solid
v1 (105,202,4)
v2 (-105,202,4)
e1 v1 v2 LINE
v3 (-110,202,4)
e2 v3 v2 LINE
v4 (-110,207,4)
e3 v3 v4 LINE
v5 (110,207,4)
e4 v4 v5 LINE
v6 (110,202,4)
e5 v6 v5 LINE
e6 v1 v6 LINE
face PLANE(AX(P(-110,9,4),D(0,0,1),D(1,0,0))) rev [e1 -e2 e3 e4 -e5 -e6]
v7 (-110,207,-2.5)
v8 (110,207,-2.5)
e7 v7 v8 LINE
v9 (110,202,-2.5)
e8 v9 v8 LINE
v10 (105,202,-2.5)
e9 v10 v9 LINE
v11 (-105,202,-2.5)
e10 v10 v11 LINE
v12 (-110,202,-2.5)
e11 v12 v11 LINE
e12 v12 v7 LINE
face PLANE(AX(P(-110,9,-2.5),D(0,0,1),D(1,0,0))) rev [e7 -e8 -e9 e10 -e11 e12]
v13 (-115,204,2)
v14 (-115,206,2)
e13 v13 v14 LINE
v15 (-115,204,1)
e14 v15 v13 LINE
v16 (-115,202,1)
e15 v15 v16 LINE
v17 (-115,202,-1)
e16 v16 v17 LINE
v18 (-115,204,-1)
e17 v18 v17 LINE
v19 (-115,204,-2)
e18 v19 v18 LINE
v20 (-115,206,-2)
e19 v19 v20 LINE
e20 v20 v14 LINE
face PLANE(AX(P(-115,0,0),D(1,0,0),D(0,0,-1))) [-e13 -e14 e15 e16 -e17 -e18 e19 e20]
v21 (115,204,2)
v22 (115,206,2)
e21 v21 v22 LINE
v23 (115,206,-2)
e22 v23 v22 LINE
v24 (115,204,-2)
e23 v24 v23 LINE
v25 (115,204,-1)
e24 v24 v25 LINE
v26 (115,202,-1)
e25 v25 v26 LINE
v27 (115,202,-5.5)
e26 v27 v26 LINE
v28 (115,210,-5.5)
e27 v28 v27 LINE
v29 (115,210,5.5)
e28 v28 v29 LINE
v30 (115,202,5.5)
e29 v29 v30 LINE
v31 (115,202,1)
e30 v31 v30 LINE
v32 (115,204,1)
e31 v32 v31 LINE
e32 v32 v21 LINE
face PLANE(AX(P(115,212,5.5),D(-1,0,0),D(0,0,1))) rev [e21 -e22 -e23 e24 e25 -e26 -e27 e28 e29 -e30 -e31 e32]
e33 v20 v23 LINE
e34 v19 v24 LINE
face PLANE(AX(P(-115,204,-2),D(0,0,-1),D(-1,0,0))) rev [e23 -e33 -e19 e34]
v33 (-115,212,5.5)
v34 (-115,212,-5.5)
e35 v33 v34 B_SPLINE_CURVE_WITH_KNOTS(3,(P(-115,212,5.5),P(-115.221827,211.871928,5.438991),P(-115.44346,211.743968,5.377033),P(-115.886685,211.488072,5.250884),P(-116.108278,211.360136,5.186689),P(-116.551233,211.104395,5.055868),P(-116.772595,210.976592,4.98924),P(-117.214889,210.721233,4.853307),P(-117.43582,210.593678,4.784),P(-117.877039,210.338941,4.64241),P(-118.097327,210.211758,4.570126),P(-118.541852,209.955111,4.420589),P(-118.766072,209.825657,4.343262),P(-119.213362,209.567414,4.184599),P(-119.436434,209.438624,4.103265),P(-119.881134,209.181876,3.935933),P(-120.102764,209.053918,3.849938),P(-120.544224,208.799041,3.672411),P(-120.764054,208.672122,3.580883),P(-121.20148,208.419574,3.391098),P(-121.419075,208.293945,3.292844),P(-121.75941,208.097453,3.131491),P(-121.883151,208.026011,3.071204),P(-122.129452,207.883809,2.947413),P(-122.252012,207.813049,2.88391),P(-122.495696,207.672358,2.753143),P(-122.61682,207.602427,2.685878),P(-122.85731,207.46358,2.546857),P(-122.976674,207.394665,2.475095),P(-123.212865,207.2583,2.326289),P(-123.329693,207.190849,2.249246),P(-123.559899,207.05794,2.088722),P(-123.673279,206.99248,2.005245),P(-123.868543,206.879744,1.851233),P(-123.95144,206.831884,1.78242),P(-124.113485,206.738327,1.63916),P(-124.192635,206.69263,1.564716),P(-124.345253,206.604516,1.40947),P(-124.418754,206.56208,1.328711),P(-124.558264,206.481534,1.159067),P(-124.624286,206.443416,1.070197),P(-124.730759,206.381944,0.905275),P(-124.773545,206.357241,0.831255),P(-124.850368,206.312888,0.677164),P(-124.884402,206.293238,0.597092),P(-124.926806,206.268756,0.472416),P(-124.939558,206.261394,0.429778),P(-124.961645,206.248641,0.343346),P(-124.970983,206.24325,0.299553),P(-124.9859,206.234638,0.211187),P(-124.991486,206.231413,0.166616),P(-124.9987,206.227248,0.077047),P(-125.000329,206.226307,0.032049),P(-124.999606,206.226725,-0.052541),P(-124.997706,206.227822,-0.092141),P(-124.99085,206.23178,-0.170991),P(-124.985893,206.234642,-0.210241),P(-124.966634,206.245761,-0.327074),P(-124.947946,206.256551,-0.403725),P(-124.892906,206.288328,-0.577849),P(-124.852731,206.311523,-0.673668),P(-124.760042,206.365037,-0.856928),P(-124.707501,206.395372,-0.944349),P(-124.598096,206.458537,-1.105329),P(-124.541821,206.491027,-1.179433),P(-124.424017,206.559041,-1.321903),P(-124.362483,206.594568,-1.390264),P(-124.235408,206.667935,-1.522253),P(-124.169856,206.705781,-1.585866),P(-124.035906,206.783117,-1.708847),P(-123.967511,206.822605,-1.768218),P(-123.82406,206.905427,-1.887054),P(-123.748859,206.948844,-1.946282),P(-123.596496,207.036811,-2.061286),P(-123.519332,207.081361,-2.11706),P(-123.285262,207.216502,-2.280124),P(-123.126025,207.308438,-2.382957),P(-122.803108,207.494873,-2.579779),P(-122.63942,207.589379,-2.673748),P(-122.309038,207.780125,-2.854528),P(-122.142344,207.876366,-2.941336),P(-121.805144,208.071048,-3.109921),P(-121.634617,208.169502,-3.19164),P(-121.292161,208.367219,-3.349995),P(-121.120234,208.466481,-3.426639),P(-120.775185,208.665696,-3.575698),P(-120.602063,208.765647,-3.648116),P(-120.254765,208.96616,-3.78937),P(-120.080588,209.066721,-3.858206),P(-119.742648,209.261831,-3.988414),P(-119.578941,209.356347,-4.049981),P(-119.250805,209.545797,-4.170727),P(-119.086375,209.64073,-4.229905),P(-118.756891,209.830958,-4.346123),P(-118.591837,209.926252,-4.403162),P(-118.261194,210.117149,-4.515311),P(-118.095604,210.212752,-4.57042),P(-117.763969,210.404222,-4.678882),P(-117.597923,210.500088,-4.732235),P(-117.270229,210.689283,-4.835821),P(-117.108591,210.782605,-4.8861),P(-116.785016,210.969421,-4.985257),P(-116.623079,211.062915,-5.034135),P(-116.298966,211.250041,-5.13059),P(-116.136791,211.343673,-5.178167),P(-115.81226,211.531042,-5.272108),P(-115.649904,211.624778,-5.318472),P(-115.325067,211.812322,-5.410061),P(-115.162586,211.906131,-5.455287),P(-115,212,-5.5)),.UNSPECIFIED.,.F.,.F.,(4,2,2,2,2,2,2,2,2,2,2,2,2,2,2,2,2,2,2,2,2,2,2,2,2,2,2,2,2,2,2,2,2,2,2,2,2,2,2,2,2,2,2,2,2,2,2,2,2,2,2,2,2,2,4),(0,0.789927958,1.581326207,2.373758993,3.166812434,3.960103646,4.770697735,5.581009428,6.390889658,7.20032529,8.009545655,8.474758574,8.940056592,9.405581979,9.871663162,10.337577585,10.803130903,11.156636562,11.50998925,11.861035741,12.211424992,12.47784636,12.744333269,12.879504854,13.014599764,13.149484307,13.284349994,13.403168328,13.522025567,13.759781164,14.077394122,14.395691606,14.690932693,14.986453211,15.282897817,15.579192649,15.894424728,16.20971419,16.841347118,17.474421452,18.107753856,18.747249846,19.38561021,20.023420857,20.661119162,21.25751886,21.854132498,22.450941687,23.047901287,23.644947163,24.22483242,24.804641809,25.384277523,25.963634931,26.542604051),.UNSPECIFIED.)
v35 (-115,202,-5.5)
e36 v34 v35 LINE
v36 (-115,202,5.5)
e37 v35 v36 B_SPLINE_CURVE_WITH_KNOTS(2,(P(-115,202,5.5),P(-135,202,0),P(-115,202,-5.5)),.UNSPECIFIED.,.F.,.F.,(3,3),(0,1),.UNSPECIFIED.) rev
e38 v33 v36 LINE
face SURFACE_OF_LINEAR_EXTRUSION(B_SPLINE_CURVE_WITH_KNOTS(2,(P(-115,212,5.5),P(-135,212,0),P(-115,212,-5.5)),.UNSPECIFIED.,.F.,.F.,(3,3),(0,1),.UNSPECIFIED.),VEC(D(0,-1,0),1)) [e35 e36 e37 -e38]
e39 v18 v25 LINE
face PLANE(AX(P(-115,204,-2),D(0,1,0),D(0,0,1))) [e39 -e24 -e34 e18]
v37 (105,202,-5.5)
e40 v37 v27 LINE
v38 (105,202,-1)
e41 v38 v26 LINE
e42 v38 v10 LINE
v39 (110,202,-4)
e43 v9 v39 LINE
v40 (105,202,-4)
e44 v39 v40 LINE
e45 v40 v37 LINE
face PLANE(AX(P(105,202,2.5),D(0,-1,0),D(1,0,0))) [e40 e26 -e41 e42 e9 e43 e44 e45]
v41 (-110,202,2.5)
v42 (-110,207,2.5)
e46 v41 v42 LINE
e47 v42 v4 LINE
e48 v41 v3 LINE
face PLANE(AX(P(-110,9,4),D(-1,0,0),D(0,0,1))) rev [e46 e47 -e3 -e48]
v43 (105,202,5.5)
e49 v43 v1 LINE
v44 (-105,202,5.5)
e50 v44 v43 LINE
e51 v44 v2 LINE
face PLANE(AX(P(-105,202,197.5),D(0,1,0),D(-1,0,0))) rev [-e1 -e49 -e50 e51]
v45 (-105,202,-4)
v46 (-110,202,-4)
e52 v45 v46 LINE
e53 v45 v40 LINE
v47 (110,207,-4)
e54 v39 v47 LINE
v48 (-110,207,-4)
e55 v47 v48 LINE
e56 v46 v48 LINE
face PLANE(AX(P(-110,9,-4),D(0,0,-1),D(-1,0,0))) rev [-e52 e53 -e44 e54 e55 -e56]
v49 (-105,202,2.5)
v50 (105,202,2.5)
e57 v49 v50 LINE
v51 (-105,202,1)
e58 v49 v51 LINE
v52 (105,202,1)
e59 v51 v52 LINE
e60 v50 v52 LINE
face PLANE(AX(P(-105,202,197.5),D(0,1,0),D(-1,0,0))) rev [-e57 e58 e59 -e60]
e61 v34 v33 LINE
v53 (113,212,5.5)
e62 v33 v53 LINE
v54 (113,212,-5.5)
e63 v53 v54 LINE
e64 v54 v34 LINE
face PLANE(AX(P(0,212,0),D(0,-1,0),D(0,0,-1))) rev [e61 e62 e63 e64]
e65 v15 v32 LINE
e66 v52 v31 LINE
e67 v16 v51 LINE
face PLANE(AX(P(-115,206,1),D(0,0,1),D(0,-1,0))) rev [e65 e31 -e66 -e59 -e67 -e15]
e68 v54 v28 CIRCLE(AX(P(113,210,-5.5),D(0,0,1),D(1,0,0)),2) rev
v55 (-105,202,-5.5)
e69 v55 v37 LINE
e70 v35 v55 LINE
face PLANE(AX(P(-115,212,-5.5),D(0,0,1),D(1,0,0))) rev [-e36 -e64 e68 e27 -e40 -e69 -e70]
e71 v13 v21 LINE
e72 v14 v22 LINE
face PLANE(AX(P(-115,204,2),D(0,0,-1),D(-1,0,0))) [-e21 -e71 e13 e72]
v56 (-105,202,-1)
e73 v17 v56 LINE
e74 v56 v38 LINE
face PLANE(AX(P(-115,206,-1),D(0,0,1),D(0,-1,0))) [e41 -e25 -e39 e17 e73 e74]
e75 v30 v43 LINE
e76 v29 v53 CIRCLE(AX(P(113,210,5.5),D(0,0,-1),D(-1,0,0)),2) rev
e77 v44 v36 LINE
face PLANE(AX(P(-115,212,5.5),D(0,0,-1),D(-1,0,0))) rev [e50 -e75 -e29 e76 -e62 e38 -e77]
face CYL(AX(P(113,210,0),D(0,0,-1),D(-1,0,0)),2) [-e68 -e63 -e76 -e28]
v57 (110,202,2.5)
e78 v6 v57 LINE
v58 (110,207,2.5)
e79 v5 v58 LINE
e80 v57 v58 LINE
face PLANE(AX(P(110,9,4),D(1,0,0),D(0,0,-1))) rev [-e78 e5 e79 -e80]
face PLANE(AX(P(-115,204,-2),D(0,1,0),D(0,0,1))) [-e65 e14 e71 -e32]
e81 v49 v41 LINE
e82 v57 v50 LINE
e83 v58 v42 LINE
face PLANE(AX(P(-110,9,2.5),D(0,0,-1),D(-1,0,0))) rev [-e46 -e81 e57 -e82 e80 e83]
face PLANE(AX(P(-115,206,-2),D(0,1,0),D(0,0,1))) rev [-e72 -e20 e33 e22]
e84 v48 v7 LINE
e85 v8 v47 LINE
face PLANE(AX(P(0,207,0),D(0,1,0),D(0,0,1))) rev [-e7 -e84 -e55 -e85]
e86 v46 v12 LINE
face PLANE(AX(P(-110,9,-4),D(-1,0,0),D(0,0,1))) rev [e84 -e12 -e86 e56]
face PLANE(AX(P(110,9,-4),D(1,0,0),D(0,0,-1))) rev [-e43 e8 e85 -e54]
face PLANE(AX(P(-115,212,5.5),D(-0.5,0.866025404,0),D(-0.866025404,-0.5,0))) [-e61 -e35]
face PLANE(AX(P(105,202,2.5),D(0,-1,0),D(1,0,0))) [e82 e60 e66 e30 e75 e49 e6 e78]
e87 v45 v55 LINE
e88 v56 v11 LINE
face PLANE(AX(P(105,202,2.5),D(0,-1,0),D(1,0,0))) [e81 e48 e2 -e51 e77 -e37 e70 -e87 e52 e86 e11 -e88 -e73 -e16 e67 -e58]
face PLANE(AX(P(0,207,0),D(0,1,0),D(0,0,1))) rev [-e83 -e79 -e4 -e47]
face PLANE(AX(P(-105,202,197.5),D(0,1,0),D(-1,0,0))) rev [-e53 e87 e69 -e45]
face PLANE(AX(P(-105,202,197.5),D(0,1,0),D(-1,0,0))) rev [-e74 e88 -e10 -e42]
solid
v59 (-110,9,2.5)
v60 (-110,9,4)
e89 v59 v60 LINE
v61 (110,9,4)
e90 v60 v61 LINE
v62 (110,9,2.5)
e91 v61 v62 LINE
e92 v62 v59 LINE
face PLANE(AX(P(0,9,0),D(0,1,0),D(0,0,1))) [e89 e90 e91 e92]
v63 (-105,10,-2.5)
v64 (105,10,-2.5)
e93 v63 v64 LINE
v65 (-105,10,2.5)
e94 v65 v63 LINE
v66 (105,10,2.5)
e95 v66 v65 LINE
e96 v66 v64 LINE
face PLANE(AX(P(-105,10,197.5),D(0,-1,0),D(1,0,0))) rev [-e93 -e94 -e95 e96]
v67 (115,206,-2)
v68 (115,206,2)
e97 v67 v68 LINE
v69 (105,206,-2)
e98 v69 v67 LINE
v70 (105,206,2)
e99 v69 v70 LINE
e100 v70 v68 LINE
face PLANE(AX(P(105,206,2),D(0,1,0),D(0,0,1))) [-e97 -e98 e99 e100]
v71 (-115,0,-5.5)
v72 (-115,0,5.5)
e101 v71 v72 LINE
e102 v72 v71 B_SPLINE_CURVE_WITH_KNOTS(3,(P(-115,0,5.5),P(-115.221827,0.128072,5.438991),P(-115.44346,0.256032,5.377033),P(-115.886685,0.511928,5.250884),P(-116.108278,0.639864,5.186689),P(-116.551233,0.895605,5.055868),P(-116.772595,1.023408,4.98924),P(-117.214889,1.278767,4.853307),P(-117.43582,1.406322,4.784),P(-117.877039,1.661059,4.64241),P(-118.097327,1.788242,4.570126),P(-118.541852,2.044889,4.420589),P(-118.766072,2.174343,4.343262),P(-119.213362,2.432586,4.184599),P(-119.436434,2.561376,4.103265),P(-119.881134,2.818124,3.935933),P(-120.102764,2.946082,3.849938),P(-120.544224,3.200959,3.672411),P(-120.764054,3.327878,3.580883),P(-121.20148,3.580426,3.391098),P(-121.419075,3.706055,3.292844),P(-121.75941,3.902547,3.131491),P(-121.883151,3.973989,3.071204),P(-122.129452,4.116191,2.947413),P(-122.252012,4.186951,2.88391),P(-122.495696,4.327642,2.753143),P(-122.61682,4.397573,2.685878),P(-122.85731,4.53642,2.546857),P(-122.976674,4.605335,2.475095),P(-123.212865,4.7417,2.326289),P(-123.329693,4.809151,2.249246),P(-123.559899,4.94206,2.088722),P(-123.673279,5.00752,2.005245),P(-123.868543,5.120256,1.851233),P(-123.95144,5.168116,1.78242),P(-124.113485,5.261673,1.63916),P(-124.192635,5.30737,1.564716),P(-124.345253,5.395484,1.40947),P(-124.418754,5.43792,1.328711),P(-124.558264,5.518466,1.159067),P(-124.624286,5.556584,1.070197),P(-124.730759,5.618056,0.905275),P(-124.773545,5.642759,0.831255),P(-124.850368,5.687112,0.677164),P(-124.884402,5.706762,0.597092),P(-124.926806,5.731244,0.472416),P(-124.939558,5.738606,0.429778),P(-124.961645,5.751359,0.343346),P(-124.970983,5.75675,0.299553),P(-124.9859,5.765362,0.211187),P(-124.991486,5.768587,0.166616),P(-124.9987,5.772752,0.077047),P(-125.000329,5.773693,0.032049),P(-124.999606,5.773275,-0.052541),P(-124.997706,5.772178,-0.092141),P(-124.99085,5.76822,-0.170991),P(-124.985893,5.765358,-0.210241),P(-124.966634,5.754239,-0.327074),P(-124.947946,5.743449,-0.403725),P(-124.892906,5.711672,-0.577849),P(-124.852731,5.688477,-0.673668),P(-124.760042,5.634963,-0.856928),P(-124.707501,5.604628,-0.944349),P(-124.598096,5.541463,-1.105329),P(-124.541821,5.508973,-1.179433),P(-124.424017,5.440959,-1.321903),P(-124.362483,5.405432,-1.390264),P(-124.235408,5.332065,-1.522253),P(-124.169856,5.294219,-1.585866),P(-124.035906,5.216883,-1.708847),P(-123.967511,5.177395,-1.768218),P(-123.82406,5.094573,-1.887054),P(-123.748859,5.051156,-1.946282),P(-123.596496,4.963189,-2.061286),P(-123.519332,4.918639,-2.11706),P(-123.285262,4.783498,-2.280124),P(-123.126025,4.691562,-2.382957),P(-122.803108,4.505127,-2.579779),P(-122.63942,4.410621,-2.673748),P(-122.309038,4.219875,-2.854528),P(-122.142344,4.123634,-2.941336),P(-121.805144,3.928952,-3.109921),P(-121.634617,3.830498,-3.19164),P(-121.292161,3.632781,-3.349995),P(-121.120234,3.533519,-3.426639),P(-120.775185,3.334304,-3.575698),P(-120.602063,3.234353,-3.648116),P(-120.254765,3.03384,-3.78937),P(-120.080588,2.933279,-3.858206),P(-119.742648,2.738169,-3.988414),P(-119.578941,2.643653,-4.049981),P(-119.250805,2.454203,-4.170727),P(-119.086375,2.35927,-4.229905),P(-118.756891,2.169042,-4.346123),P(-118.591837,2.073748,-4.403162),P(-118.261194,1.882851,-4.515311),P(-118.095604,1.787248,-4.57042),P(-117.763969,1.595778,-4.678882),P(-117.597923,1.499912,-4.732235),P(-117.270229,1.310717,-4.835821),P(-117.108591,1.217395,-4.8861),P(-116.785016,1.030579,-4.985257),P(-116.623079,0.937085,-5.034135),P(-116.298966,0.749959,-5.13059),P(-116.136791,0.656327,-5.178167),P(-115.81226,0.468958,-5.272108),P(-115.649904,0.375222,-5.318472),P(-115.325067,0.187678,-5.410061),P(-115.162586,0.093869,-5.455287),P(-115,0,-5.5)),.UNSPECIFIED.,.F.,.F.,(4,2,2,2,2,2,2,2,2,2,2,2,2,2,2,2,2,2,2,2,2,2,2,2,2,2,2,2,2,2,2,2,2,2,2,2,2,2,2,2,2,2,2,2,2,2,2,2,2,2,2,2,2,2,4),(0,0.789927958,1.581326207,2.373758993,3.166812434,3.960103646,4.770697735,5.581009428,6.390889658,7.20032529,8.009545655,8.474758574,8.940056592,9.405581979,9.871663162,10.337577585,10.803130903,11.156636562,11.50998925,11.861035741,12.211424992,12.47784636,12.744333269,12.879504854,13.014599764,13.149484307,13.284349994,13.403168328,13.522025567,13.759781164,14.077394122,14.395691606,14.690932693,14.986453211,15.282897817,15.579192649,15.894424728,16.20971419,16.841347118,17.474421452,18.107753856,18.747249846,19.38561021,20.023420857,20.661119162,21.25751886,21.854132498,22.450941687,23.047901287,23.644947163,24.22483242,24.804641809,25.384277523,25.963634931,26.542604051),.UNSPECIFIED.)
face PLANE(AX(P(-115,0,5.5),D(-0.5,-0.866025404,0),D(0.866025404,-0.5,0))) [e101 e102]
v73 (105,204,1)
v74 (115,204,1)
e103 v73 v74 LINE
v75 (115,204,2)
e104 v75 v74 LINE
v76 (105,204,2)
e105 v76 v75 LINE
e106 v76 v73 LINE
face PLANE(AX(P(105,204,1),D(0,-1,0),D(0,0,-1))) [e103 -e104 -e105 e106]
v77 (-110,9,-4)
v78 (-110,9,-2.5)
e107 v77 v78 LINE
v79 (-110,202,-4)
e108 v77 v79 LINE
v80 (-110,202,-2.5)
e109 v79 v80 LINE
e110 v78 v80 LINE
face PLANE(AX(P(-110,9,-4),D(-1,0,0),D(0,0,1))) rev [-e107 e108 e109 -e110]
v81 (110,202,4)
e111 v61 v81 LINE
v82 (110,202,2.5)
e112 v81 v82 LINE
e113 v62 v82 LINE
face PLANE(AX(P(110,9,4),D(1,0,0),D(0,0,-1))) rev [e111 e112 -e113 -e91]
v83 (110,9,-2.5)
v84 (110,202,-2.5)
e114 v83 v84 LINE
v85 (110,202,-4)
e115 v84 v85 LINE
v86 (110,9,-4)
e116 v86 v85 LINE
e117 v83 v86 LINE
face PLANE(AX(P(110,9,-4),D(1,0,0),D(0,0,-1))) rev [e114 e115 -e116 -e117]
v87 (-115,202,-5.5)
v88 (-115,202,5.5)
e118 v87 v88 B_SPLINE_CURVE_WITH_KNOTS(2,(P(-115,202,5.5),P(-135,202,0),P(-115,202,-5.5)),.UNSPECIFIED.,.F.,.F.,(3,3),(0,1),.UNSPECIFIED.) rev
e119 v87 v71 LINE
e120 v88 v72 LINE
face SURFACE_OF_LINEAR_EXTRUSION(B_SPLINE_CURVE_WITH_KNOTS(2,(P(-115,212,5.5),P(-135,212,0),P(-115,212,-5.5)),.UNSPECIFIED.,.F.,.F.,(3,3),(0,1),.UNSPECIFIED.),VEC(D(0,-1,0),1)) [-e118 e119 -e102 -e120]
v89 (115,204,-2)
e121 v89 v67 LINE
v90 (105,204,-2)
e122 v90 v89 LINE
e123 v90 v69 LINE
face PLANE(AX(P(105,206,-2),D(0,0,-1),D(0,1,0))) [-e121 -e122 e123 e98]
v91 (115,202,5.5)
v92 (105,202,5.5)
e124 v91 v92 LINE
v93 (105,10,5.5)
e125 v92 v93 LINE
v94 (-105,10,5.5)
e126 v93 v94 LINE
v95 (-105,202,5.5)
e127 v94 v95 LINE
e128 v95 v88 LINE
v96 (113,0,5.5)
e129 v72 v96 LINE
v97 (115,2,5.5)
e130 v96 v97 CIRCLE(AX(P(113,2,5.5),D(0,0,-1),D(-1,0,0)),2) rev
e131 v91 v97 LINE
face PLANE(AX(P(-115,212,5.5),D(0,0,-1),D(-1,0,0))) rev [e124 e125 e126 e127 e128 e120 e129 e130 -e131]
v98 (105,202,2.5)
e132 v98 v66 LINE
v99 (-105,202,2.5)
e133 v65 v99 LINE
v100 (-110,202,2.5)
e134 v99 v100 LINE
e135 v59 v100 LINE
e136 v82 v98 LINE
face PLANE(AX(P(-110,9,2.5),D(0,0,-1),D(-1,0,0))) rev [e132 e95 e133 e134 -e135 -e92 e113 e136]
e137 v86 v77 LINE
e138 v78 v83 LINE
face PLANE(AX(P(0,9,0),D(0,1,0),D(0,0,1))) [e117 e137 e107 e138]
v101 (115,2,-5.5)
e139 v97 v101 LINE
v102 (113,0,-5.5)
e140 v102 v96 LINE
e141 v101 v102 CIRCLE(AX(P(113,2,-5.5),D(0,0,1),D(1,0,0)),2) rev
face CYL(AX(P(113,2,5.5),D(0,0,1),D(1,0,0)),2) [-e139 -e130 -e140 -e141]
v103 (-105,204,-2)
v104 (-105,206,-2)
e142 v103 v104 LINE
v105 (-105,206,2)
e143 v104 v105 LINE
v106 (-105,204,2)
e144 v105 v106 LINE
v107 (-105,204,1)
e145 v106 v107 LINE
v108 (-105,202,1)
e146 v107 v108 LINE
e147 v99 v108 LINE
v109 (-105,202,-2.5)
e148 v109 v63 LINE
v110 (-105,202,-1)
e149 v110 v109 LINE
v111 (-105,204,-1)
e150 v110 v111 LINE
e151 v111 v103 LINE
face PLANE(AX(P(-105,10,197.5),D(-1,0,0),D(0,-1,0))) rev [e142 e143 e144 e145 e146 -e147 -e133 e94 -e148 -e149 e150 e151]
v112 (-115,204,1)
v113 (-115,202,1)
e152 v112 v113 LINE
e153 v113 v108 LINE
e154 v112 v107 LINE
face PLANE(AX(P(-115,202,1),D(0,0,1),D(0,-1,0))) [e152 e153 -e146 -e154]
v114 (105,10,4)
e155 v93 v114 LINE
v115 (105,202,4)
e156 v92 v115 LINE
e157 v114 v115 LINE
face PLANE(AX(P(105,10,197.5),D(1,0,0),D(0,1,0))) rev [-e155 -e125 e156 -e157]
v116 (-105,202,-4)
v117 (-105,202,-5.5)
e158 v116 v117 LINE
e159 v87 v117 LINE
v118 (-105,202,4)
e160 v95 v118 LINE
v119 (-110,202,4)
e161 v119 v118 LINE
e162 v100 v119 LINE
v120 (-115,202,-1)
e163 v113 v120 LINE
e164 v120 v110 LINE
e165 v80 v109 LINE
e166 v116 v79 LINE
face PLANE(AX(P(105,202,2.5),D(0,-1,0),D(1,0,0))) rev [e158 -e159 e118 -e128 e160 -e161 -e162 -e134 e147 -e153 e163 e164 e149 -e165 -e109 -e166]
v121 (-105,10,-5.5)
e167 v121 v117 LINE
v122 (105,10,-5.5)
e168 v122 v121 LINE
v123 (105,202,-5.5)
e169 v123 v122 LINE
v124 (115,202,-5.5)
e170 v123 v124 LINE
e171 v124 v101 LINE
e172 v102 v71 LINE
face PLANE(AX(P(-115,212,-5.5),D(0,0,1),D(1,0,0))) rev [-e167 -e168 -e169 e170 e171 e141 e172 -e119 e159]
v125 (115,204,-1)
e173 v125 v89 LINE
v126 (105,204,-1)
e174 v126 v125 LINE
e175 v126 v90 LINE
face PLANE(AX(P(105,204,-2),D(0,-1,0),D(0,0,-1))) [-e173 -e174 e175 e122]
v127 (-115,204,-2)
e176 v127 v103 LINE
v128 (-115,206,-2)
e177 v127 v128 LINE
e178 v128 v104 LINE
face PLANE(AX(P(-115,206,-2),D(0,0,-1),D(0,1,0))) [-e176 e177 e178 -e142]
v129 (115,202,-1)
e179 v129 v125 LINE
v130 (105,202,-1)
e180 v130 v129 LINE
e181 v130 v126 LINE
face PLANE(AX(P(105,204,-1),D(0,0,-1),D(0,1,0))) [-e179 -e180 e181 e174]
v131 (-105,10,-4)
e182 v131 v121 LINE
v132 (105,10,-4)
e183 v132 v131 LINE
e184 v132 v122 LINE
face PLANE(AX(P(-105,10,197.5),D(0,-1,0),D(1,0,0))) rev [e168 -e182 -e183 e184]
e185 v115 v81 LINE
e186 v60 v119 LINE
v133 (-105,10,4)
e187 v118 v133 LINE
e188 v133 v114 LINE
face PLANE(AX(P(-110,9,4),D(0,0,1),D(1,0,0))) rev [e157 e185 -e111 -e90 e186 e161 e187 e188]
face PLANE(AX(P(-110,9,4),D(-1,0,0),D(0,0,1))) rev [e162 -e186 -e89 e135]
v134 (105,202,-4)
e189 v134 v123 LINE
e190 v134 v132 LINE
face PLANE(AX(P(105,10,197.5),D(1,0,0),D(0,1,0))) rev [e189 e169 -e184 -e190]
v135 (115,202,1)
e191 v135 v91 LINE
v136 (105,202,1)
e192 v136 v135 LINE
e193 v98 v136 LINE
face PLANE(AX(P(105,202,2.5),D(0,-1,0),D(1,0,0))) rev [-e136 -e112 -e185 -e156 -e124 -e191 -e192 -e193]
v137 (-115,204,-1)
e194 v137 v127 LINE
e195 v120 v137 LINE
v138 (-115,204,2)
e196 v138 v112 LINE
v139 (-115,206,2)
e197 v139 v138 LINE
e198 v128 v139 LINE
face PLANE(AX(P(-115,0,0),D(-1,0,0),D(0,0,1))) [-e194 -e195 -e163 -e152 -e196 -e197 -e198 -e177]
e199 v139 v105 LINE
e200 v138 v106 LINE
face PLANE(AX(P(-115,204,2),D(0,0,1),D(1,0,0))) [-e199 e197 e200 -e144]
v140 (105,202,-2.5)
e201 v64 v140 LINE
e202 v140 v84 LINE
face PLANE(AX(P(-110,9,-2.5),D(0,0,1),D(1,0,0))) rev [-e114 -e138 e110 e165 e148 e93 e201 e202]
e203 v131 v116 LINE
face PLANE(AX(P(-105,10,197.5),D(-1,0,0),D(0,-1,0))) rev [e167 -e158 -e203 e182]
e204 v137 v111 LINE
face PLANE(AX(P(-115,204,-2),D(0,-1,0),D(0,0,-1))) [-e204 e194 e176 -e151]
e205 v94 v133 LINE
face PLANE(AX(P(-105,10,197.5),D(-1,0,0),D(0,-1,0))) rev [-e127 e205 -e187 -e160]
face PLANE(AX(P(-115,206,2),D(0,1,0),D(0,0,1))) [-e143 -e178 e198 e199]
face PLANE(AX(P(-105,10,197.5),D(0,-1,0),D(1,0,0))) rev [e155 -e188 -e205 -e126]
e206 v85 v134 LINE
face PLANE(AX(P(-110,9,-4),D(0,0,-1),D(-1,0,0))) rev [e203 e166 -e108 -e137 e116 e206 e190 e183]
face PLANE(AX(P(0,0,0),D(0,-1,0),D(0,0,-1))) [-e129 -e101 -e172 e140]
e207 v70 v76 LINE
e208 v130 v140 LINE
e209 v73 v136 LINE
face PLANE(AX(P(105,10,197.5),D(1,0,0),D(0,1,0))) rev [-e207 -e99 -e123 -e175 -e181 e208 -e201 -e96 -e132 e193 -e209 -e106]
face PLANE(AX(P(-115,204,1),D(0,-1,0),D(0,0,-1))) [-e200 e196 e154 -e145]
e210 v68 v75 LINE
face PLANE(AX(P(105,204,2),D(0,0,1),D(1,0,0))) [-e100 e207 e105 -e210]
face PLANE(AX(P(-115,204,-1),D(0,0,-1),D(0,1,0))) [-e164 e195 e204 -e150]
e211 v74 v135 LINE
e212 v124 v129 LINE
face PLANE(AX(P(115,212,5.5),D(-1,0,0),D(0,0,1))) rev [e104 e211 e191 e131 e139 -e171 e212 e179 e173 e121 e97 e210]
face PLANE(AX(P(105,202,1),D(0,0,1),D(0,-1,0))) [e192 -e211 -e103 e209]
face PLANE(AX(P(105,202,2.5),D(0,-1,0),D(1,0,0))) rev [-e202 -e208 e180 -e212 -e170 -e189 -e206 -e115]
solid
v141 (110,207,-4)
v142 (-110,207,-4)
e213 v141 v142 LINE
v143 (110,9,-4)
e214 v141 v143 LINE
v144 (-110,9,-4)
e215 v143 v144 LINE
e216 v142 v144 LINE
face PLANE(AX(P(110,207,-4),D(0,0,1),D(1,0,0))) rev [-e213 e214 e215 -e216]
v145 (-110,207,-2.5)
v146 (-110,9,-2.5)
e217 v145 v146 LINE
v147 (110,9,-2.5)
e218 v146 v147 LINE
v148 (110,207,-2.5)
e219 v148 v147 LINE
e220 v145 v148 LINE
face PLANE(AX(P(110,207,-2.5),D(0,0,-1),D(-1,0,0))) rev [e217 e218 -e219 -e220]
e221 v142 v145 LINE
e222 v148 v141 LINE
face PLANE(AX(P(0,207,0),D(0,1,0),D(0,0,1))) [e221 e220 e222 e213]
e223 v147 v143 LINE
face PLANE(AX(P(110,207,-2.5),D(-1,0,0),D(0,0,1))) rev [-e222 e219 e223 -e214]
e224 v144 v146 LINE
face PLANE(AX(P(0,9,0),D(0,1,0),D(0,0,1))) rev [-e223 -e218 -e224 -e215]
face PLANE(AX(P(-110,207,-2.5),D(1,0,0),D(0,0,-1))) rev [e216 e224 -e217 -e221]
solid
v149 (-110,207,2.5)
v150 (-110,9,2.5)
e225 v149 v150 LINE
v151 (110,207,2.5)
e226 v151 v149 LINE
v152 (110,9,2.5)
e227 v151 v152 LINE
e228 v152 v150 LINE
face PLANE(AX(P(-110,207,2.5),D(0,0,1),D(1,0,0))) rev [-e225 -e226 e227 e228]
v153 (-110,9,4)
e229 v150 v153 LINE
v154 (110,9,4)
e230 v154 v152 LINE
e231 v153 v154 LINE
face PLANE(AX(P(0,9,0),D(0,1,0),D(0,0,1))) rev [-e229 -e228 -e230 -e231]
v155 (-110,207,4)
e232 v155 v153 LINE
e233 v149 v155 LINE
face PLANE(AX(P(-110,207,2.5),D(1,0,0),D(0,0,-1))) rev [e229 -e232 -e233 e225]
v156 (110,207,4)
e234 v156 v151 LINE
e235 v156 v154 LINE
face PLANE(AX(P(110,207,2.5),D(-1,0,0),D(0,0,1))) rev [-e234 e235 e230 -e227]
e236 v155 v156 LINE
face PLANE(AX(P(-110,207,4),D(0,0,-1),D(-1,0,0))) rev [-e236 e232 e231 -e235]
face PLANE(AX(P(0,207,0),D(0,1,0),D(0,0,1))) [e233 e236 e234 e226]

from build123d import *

# Parameters (mm, degrees)
SKETCH_2_W                 = 230
SKETCH_2_H                 = 11
EXTRUDE_1_DEPTH            = 212
SKETCH_3_W                 = 220
SKETCH_3_H                 = 1.5
CUT_EXTRUDE_1_DEPTH        = 198
SKETCH_4_W                 = 210
SKETCH_4_H                 = 192
CUT_EXTRUDE_2_DEPTH        = 203
EXTRUDE_2_DEPTH            = 212
DRAFT_START                = -7
DRAFT_4_DEPTH              = 14
SKETCH_6_W                 = 220
SKETCH_6_H                 = 1.5
EXTRUDE_3_DEPTH            = 198
EXTRUDE_3_2_DEPTH          = 198
FILLET_4_R                 = 2
SPLIT_START                = -2.5
SPLIT_BODIES_2_OUTLINE_W   = 220
SPLIT_BODIES_2_OUTLINE_H   = 5
SPLIT_BODIES_2_DEPTH       = 5
SPLIT_START_2              = -5.5
SPLIT_BODIES_2_2_OUTLINE_W = 220
SPLIT_BODIES_2_2_OUTLINE_H = 5
SPLIT_BODIES_2_2_DEPTH     = 1.5
SPLIT_START_3              = 4
SPLIT_BODIES_2_3_OUTLINE_W = 220
SPLIT_BODIES_2_3_OUTLINE_H = 5
SPLIT_BODIES_2_3_DEPTH     = 1.5
SPLIT_START_4              = 207
SPLIT_BODIES_2_4_DEPTH     = 5
SPLIT_START_5              = 202
SPLIT_BODIES_2_5_OUTLINE_W = 5
SPLIT_BODIES_2_5_OUTLINE_H = 11
SPLIT_BODIES_2_5_DEPTH     = 5
SPLIT_START_6              = -6
SPLIT_BODIES_2_6_DEPTH     = 12
SPLIT_BODIES_2_7_DEPTH     = 10
SKETCH_7_W                 = 2
SKETCH_7_H                 = 4
SKETCH_7_W_2               = 4
SKETCH_7_H_2               = 2
CUT_EXTRUDE_3_DEPTH        = 230
EXTRUDE_4_DEPTH            = 10
PATTERN_LINEAR_1_COUNT     = 2
PATTERN_LINEAR_1_PITCH     = 220


with BuildPart() as part:
    # Эскиз2 → Бобышка-Вытянуть1 (new body)
    with BuildSketch(Plane(origin=(0, 0, 0), x_dir=(1, 0, 0), z_dir=(0, 1, 0))):
        Rectangle(SKETCH_2_W, SKETCH_2_H)
    extrude(amount=EXTRUDE_1_DEPTH)

    # Эскиз3 → Вырез-Вытянуть1 (cut)
    with BuildSketch(Plane(origin=(0, 207, 0), x_dir=(1, 0, 0), z_dir=(0, 1, 0))):
        with Locations((0, 3.25)):
            Rectangle(SKETCH_3_W, SKETCH_3_H)
        with Locations((0, -3.25)):
            Rectangle(SKETCH_3_W, SKETCH_3_H)
    extrude(amount=-CUT_EXTRUDE_1_DEPTH, mode=Mode.SUBTRACT)

    # Эскиз4 → Вырез-Вытянуть2 (cut)
    with BuildSketch(Plane(origin=(0, 0, -5.5), x_dir=(-1, 0, 0), z_dir=(0, 0, -1))):
        with Locations((0, 106)):
            Rectangle(SKETCH_4_W, SKETCH_4_H)
    extrude(amount=-CUT_EXTRUDE_2_DEPTH, mode=Mode.SUBTRACT)


with BuildPart() as body_2:
    # Эскиз5 → Бобышка-Вытянуть2 (new body)
    with BuildSketch(Plane(origin=(0, 0, 0), x_dir=(-1, 0, 0), z_dir=(0, -1, 0))):
        with BuildLine():
            Line((115, -5.5), (115, 5.5))
            add(Edge.make_bspline(
                [(115, 5.5), (135, 0), (115, -5.5)],
                knots=[0, 0, 0, 1, 1, 1], degree=2))
        make_face()
    extrude(amount=-EXTRUDE_2_DEPTH)

    # Уклон4: read off the stored shape, not the designer's step
    # Уклон4 outline → Уклон4 (cut)
    with BuildSketch(Plane.XY.offset(DRAFT_START)):
        Polygon((-124.999999877, 206.226497379), (-115, 212), (-127, 212), (-127, 205.07179677), align=None)
        Polygon((-124.999999877, 5.773502621), (-127, 6.92820323), (-127, 0), (-115, 0), align=None)
    extrude(amount=DRAFT_4_DEPTH, mode=Mode.SUBTRACT)


with BuildPart() as part_1:
    add(part.part)

    # Combine 1: read off the stored shape, not the designer's step
    # Combine 1: union body 2
    add(body_2.part)

    # Скругление4
    fillet_4_edges = [part_1.edges().sort_by_distance(p)[0] for p in [
        (115, 0, 0),
        (115, 212, 0),
    ]]
    fillet(fillet_4_edges, radius=FILLET_4_R)

    # Split Bodies 2 7 outline → Split Bodies 2 7 (cut)
    with BuildSketch(Plane(origin=(0, 0, 0), x_dir=(1, 0, 0), z_dir=(0, 1, 0)).offset(SPLIT_START_5)):
        with BuildLine():
            Line((115, 5.5), (-115, 5.5))
            add(Edge.make_bspline(
                [(-115, -5.5), (-135, 0), (-115, 5.5)],
                knots=[0, 0, 0, 1, 1, 1], degree=2))
            Line((-115, -5.5), (115, -5.5))
            Line((115, -5.5), (115, 5.5))
        make_face()
    extrude(amount=SPLIT_BODIES_2_7_DEPTH, mode=Mode.SUBTRACT)

    # Эскиз8 → Бобышка-Вытянуть4 (add)
    with BuildSketch(Plane(origin=(115, 0, 0), x_dir=(0, 0, -1), z_dir=(1, 0, 0))):
        Polygon((-1, 202), (-1, 204), (-2, 204), (-2, 206), (2, 206), (2, 204), (1, 204), (1, 202), align=None)
    extrude_4 = extrude(amount=-EXTRUDE_4_DEPTH)

    # Линейный массив1: Бобышка-Вытянуть4 ×2
    with Locations(*[(-i * PATTERN_LINEAR_1_PITCH, 0, 0) for i in range(1, PATTERN_LINEAR_1_COUNT)]):
        add(extrude_4)


with BuildPart() as body_2_2:
    # Эскиз6 → Бобышка-Вытянуть3 (new body)
    with BuildSketch(Plane(origin=(0, 9, 0), x_dir=(1, 0, 0), z_dir=(0, 1, 0))):
        with Locations((0, 3.25)):
            Rectangle(SKETCH_6_W, SKETCH_6_H)
    extrude(amount=EXTRUDE_3_DEPTH)


with BuildPart() as body_3:
    # Эскиз6 → Extrude 3 2 (new body)
    with BuildSketch(Plane(origin=(0, 9, 0), x_dir=(1, 0, 0), z_dir=(0, 1, 0))):
        with Locations((0, -3.25)):
            Rectangle(SKETCH_6_W, SKETCH_6_H)
    extrude(amount=EXTRUDE_3_2_DEPTH)


with BuildPart() as body_4:
    # Split Bodies 2: read off the stored shape, not the designer's step
    # Split Bodies 2 outline → Split Bodies 2 (new body)
    with BuildSketch(Plane.XY.offset(SPLIT_START)):
        with Locations((0, 204.5)):
            Rectangle(SPLIT_BODIES_2_OUTLINE_W, SPLIT_BODIES_2_OUTLINE_H)
    extrude(amount=SPLIT_BODIES_2_DEPTH)

    # Split Bodies 2 2 outline → Split Bodies 2 2 (add)
    with BuildSketch(Plane.XY.offset(SPLIT_START_2)):
        with Locations((0, 204.5)):
            Rectangle(SPLIT_BODIES_2_2_OUTLINE_W, SPLIT_BODIES_2_2_OUTLINE_H)
    extrude(amount=SPLIT_BODIES_2_2_DEPTH)

    # Split Bodies 2 3 outline → Split Bodies 2 3 (add)
    with BuildSketch(Plane.XY.offset(SPLIT_START_3)):
        with Locations((0, 204.5)):
            Rectangle(SPLIT_BODIES_2_3_OUTLINE_W, SPLIT_BODIES_2_3_OUTLINE_H)
    extrude(amount=SPLIT_BODIES_2_3_DEPTH)

    # Split Bodies 2 4 outline → Split Bodies 2 4 (add)
    with BuildSketch(Plane(origin=(0, 0, 0), x_dir=(1, 0, 0), z_dir=(0, 1, 0)).offset(SPLIT_START_4)):
        with BuildLine():
            add(Edge.make_bspline(
                [(-115, -5.5), (-135, 0), (-115, 5.5)],
                knots=[0, 0, 0, 1, 1, 1], degree=2))
            Line((-115, -5.5), (115, -5.5))
            Line((115, -5.5), (115, 5.5))
            Line((115, 5.5), (-115, 5.5))
        make_face()
    extrude(amount=SPLIT_BODIES_2_4_DEPTH)

    # Split Bodies 2 5 outline → Split Bodies 2 5 (add)
    with BuildSketch(Plane(origin=(0, 0, 0), x_dir=(1, 0, 0), z_dir=(0, 1, 0)).offset(SPLIT_START_5)):
        with BuildLine():
            add(Edge.make_bspline(
                [(-115, -5.5), (-135, 0), (-115, 5.5)],
                knots=[0, 0, 0, 1, 1, 1], degree=2))
            Line((-115, -5.5), (-110, -5.5))
            Line((-110, -5.5), (-110, 5.5))
            Line((-110, 5.5), (-115, 5.5))
        make_face()
        with Locations((112.5, 0)):
            Rectangle(SPLIT_BODIES_2_5_OUTLINE_W, SPLIT_BODIES_2_5_OUTLINE_H)
    extrude(amount=SPLIT_BODIES_2_5_DEPTH)

    # Split Bodies 2 6 outline → Split Bodies 2 6 (cut)
    with BuildSketch(Plane.XY.offset(SPLIT_START_6)):
        with BuildLine():
            Line((-111.535898385, 214), (-115, 212))
            Line((-115, 212), (113, 212))
            ThreePointArc((113, 212), (114.414213562, 211.414213562), (115, 210))
            Line((115, 210), (115, 214))
            Line((115, 214), (-111.535898385, 214))
        make_face()
        Polygon((-124.999999877, 206.226497379), (-115, 212), (-126, 212.000000152), (-126, 205.649147039), align=None)
    extrude(amount=SPLIT_BODIES_2_6_DEPTH, mode=Mode.SUBTRACT)

    # Эскиз7 → Вырез-Вытянуть3 (cut)
    with BuildSketch(Plane(origin=(115, 0, 0), x_dir=(0, 0, -1), z_dir=(1, 0, 0))):
        with Locations((0, 204)):
            Rectangle(SKETCH_7_W, SKETCH_7_H)
        with Locations((0, 205)):
            Rectangle(SKETCH_7_W_2, SKETCH_7_H_2)
    extrude(amount=-CUT_EXTRUDE_3_DEPTH, mode=Mode.SUBTRACT)


solid = Compound([part_1.part, body_2_2.part, body_3.part, body_4.part])
